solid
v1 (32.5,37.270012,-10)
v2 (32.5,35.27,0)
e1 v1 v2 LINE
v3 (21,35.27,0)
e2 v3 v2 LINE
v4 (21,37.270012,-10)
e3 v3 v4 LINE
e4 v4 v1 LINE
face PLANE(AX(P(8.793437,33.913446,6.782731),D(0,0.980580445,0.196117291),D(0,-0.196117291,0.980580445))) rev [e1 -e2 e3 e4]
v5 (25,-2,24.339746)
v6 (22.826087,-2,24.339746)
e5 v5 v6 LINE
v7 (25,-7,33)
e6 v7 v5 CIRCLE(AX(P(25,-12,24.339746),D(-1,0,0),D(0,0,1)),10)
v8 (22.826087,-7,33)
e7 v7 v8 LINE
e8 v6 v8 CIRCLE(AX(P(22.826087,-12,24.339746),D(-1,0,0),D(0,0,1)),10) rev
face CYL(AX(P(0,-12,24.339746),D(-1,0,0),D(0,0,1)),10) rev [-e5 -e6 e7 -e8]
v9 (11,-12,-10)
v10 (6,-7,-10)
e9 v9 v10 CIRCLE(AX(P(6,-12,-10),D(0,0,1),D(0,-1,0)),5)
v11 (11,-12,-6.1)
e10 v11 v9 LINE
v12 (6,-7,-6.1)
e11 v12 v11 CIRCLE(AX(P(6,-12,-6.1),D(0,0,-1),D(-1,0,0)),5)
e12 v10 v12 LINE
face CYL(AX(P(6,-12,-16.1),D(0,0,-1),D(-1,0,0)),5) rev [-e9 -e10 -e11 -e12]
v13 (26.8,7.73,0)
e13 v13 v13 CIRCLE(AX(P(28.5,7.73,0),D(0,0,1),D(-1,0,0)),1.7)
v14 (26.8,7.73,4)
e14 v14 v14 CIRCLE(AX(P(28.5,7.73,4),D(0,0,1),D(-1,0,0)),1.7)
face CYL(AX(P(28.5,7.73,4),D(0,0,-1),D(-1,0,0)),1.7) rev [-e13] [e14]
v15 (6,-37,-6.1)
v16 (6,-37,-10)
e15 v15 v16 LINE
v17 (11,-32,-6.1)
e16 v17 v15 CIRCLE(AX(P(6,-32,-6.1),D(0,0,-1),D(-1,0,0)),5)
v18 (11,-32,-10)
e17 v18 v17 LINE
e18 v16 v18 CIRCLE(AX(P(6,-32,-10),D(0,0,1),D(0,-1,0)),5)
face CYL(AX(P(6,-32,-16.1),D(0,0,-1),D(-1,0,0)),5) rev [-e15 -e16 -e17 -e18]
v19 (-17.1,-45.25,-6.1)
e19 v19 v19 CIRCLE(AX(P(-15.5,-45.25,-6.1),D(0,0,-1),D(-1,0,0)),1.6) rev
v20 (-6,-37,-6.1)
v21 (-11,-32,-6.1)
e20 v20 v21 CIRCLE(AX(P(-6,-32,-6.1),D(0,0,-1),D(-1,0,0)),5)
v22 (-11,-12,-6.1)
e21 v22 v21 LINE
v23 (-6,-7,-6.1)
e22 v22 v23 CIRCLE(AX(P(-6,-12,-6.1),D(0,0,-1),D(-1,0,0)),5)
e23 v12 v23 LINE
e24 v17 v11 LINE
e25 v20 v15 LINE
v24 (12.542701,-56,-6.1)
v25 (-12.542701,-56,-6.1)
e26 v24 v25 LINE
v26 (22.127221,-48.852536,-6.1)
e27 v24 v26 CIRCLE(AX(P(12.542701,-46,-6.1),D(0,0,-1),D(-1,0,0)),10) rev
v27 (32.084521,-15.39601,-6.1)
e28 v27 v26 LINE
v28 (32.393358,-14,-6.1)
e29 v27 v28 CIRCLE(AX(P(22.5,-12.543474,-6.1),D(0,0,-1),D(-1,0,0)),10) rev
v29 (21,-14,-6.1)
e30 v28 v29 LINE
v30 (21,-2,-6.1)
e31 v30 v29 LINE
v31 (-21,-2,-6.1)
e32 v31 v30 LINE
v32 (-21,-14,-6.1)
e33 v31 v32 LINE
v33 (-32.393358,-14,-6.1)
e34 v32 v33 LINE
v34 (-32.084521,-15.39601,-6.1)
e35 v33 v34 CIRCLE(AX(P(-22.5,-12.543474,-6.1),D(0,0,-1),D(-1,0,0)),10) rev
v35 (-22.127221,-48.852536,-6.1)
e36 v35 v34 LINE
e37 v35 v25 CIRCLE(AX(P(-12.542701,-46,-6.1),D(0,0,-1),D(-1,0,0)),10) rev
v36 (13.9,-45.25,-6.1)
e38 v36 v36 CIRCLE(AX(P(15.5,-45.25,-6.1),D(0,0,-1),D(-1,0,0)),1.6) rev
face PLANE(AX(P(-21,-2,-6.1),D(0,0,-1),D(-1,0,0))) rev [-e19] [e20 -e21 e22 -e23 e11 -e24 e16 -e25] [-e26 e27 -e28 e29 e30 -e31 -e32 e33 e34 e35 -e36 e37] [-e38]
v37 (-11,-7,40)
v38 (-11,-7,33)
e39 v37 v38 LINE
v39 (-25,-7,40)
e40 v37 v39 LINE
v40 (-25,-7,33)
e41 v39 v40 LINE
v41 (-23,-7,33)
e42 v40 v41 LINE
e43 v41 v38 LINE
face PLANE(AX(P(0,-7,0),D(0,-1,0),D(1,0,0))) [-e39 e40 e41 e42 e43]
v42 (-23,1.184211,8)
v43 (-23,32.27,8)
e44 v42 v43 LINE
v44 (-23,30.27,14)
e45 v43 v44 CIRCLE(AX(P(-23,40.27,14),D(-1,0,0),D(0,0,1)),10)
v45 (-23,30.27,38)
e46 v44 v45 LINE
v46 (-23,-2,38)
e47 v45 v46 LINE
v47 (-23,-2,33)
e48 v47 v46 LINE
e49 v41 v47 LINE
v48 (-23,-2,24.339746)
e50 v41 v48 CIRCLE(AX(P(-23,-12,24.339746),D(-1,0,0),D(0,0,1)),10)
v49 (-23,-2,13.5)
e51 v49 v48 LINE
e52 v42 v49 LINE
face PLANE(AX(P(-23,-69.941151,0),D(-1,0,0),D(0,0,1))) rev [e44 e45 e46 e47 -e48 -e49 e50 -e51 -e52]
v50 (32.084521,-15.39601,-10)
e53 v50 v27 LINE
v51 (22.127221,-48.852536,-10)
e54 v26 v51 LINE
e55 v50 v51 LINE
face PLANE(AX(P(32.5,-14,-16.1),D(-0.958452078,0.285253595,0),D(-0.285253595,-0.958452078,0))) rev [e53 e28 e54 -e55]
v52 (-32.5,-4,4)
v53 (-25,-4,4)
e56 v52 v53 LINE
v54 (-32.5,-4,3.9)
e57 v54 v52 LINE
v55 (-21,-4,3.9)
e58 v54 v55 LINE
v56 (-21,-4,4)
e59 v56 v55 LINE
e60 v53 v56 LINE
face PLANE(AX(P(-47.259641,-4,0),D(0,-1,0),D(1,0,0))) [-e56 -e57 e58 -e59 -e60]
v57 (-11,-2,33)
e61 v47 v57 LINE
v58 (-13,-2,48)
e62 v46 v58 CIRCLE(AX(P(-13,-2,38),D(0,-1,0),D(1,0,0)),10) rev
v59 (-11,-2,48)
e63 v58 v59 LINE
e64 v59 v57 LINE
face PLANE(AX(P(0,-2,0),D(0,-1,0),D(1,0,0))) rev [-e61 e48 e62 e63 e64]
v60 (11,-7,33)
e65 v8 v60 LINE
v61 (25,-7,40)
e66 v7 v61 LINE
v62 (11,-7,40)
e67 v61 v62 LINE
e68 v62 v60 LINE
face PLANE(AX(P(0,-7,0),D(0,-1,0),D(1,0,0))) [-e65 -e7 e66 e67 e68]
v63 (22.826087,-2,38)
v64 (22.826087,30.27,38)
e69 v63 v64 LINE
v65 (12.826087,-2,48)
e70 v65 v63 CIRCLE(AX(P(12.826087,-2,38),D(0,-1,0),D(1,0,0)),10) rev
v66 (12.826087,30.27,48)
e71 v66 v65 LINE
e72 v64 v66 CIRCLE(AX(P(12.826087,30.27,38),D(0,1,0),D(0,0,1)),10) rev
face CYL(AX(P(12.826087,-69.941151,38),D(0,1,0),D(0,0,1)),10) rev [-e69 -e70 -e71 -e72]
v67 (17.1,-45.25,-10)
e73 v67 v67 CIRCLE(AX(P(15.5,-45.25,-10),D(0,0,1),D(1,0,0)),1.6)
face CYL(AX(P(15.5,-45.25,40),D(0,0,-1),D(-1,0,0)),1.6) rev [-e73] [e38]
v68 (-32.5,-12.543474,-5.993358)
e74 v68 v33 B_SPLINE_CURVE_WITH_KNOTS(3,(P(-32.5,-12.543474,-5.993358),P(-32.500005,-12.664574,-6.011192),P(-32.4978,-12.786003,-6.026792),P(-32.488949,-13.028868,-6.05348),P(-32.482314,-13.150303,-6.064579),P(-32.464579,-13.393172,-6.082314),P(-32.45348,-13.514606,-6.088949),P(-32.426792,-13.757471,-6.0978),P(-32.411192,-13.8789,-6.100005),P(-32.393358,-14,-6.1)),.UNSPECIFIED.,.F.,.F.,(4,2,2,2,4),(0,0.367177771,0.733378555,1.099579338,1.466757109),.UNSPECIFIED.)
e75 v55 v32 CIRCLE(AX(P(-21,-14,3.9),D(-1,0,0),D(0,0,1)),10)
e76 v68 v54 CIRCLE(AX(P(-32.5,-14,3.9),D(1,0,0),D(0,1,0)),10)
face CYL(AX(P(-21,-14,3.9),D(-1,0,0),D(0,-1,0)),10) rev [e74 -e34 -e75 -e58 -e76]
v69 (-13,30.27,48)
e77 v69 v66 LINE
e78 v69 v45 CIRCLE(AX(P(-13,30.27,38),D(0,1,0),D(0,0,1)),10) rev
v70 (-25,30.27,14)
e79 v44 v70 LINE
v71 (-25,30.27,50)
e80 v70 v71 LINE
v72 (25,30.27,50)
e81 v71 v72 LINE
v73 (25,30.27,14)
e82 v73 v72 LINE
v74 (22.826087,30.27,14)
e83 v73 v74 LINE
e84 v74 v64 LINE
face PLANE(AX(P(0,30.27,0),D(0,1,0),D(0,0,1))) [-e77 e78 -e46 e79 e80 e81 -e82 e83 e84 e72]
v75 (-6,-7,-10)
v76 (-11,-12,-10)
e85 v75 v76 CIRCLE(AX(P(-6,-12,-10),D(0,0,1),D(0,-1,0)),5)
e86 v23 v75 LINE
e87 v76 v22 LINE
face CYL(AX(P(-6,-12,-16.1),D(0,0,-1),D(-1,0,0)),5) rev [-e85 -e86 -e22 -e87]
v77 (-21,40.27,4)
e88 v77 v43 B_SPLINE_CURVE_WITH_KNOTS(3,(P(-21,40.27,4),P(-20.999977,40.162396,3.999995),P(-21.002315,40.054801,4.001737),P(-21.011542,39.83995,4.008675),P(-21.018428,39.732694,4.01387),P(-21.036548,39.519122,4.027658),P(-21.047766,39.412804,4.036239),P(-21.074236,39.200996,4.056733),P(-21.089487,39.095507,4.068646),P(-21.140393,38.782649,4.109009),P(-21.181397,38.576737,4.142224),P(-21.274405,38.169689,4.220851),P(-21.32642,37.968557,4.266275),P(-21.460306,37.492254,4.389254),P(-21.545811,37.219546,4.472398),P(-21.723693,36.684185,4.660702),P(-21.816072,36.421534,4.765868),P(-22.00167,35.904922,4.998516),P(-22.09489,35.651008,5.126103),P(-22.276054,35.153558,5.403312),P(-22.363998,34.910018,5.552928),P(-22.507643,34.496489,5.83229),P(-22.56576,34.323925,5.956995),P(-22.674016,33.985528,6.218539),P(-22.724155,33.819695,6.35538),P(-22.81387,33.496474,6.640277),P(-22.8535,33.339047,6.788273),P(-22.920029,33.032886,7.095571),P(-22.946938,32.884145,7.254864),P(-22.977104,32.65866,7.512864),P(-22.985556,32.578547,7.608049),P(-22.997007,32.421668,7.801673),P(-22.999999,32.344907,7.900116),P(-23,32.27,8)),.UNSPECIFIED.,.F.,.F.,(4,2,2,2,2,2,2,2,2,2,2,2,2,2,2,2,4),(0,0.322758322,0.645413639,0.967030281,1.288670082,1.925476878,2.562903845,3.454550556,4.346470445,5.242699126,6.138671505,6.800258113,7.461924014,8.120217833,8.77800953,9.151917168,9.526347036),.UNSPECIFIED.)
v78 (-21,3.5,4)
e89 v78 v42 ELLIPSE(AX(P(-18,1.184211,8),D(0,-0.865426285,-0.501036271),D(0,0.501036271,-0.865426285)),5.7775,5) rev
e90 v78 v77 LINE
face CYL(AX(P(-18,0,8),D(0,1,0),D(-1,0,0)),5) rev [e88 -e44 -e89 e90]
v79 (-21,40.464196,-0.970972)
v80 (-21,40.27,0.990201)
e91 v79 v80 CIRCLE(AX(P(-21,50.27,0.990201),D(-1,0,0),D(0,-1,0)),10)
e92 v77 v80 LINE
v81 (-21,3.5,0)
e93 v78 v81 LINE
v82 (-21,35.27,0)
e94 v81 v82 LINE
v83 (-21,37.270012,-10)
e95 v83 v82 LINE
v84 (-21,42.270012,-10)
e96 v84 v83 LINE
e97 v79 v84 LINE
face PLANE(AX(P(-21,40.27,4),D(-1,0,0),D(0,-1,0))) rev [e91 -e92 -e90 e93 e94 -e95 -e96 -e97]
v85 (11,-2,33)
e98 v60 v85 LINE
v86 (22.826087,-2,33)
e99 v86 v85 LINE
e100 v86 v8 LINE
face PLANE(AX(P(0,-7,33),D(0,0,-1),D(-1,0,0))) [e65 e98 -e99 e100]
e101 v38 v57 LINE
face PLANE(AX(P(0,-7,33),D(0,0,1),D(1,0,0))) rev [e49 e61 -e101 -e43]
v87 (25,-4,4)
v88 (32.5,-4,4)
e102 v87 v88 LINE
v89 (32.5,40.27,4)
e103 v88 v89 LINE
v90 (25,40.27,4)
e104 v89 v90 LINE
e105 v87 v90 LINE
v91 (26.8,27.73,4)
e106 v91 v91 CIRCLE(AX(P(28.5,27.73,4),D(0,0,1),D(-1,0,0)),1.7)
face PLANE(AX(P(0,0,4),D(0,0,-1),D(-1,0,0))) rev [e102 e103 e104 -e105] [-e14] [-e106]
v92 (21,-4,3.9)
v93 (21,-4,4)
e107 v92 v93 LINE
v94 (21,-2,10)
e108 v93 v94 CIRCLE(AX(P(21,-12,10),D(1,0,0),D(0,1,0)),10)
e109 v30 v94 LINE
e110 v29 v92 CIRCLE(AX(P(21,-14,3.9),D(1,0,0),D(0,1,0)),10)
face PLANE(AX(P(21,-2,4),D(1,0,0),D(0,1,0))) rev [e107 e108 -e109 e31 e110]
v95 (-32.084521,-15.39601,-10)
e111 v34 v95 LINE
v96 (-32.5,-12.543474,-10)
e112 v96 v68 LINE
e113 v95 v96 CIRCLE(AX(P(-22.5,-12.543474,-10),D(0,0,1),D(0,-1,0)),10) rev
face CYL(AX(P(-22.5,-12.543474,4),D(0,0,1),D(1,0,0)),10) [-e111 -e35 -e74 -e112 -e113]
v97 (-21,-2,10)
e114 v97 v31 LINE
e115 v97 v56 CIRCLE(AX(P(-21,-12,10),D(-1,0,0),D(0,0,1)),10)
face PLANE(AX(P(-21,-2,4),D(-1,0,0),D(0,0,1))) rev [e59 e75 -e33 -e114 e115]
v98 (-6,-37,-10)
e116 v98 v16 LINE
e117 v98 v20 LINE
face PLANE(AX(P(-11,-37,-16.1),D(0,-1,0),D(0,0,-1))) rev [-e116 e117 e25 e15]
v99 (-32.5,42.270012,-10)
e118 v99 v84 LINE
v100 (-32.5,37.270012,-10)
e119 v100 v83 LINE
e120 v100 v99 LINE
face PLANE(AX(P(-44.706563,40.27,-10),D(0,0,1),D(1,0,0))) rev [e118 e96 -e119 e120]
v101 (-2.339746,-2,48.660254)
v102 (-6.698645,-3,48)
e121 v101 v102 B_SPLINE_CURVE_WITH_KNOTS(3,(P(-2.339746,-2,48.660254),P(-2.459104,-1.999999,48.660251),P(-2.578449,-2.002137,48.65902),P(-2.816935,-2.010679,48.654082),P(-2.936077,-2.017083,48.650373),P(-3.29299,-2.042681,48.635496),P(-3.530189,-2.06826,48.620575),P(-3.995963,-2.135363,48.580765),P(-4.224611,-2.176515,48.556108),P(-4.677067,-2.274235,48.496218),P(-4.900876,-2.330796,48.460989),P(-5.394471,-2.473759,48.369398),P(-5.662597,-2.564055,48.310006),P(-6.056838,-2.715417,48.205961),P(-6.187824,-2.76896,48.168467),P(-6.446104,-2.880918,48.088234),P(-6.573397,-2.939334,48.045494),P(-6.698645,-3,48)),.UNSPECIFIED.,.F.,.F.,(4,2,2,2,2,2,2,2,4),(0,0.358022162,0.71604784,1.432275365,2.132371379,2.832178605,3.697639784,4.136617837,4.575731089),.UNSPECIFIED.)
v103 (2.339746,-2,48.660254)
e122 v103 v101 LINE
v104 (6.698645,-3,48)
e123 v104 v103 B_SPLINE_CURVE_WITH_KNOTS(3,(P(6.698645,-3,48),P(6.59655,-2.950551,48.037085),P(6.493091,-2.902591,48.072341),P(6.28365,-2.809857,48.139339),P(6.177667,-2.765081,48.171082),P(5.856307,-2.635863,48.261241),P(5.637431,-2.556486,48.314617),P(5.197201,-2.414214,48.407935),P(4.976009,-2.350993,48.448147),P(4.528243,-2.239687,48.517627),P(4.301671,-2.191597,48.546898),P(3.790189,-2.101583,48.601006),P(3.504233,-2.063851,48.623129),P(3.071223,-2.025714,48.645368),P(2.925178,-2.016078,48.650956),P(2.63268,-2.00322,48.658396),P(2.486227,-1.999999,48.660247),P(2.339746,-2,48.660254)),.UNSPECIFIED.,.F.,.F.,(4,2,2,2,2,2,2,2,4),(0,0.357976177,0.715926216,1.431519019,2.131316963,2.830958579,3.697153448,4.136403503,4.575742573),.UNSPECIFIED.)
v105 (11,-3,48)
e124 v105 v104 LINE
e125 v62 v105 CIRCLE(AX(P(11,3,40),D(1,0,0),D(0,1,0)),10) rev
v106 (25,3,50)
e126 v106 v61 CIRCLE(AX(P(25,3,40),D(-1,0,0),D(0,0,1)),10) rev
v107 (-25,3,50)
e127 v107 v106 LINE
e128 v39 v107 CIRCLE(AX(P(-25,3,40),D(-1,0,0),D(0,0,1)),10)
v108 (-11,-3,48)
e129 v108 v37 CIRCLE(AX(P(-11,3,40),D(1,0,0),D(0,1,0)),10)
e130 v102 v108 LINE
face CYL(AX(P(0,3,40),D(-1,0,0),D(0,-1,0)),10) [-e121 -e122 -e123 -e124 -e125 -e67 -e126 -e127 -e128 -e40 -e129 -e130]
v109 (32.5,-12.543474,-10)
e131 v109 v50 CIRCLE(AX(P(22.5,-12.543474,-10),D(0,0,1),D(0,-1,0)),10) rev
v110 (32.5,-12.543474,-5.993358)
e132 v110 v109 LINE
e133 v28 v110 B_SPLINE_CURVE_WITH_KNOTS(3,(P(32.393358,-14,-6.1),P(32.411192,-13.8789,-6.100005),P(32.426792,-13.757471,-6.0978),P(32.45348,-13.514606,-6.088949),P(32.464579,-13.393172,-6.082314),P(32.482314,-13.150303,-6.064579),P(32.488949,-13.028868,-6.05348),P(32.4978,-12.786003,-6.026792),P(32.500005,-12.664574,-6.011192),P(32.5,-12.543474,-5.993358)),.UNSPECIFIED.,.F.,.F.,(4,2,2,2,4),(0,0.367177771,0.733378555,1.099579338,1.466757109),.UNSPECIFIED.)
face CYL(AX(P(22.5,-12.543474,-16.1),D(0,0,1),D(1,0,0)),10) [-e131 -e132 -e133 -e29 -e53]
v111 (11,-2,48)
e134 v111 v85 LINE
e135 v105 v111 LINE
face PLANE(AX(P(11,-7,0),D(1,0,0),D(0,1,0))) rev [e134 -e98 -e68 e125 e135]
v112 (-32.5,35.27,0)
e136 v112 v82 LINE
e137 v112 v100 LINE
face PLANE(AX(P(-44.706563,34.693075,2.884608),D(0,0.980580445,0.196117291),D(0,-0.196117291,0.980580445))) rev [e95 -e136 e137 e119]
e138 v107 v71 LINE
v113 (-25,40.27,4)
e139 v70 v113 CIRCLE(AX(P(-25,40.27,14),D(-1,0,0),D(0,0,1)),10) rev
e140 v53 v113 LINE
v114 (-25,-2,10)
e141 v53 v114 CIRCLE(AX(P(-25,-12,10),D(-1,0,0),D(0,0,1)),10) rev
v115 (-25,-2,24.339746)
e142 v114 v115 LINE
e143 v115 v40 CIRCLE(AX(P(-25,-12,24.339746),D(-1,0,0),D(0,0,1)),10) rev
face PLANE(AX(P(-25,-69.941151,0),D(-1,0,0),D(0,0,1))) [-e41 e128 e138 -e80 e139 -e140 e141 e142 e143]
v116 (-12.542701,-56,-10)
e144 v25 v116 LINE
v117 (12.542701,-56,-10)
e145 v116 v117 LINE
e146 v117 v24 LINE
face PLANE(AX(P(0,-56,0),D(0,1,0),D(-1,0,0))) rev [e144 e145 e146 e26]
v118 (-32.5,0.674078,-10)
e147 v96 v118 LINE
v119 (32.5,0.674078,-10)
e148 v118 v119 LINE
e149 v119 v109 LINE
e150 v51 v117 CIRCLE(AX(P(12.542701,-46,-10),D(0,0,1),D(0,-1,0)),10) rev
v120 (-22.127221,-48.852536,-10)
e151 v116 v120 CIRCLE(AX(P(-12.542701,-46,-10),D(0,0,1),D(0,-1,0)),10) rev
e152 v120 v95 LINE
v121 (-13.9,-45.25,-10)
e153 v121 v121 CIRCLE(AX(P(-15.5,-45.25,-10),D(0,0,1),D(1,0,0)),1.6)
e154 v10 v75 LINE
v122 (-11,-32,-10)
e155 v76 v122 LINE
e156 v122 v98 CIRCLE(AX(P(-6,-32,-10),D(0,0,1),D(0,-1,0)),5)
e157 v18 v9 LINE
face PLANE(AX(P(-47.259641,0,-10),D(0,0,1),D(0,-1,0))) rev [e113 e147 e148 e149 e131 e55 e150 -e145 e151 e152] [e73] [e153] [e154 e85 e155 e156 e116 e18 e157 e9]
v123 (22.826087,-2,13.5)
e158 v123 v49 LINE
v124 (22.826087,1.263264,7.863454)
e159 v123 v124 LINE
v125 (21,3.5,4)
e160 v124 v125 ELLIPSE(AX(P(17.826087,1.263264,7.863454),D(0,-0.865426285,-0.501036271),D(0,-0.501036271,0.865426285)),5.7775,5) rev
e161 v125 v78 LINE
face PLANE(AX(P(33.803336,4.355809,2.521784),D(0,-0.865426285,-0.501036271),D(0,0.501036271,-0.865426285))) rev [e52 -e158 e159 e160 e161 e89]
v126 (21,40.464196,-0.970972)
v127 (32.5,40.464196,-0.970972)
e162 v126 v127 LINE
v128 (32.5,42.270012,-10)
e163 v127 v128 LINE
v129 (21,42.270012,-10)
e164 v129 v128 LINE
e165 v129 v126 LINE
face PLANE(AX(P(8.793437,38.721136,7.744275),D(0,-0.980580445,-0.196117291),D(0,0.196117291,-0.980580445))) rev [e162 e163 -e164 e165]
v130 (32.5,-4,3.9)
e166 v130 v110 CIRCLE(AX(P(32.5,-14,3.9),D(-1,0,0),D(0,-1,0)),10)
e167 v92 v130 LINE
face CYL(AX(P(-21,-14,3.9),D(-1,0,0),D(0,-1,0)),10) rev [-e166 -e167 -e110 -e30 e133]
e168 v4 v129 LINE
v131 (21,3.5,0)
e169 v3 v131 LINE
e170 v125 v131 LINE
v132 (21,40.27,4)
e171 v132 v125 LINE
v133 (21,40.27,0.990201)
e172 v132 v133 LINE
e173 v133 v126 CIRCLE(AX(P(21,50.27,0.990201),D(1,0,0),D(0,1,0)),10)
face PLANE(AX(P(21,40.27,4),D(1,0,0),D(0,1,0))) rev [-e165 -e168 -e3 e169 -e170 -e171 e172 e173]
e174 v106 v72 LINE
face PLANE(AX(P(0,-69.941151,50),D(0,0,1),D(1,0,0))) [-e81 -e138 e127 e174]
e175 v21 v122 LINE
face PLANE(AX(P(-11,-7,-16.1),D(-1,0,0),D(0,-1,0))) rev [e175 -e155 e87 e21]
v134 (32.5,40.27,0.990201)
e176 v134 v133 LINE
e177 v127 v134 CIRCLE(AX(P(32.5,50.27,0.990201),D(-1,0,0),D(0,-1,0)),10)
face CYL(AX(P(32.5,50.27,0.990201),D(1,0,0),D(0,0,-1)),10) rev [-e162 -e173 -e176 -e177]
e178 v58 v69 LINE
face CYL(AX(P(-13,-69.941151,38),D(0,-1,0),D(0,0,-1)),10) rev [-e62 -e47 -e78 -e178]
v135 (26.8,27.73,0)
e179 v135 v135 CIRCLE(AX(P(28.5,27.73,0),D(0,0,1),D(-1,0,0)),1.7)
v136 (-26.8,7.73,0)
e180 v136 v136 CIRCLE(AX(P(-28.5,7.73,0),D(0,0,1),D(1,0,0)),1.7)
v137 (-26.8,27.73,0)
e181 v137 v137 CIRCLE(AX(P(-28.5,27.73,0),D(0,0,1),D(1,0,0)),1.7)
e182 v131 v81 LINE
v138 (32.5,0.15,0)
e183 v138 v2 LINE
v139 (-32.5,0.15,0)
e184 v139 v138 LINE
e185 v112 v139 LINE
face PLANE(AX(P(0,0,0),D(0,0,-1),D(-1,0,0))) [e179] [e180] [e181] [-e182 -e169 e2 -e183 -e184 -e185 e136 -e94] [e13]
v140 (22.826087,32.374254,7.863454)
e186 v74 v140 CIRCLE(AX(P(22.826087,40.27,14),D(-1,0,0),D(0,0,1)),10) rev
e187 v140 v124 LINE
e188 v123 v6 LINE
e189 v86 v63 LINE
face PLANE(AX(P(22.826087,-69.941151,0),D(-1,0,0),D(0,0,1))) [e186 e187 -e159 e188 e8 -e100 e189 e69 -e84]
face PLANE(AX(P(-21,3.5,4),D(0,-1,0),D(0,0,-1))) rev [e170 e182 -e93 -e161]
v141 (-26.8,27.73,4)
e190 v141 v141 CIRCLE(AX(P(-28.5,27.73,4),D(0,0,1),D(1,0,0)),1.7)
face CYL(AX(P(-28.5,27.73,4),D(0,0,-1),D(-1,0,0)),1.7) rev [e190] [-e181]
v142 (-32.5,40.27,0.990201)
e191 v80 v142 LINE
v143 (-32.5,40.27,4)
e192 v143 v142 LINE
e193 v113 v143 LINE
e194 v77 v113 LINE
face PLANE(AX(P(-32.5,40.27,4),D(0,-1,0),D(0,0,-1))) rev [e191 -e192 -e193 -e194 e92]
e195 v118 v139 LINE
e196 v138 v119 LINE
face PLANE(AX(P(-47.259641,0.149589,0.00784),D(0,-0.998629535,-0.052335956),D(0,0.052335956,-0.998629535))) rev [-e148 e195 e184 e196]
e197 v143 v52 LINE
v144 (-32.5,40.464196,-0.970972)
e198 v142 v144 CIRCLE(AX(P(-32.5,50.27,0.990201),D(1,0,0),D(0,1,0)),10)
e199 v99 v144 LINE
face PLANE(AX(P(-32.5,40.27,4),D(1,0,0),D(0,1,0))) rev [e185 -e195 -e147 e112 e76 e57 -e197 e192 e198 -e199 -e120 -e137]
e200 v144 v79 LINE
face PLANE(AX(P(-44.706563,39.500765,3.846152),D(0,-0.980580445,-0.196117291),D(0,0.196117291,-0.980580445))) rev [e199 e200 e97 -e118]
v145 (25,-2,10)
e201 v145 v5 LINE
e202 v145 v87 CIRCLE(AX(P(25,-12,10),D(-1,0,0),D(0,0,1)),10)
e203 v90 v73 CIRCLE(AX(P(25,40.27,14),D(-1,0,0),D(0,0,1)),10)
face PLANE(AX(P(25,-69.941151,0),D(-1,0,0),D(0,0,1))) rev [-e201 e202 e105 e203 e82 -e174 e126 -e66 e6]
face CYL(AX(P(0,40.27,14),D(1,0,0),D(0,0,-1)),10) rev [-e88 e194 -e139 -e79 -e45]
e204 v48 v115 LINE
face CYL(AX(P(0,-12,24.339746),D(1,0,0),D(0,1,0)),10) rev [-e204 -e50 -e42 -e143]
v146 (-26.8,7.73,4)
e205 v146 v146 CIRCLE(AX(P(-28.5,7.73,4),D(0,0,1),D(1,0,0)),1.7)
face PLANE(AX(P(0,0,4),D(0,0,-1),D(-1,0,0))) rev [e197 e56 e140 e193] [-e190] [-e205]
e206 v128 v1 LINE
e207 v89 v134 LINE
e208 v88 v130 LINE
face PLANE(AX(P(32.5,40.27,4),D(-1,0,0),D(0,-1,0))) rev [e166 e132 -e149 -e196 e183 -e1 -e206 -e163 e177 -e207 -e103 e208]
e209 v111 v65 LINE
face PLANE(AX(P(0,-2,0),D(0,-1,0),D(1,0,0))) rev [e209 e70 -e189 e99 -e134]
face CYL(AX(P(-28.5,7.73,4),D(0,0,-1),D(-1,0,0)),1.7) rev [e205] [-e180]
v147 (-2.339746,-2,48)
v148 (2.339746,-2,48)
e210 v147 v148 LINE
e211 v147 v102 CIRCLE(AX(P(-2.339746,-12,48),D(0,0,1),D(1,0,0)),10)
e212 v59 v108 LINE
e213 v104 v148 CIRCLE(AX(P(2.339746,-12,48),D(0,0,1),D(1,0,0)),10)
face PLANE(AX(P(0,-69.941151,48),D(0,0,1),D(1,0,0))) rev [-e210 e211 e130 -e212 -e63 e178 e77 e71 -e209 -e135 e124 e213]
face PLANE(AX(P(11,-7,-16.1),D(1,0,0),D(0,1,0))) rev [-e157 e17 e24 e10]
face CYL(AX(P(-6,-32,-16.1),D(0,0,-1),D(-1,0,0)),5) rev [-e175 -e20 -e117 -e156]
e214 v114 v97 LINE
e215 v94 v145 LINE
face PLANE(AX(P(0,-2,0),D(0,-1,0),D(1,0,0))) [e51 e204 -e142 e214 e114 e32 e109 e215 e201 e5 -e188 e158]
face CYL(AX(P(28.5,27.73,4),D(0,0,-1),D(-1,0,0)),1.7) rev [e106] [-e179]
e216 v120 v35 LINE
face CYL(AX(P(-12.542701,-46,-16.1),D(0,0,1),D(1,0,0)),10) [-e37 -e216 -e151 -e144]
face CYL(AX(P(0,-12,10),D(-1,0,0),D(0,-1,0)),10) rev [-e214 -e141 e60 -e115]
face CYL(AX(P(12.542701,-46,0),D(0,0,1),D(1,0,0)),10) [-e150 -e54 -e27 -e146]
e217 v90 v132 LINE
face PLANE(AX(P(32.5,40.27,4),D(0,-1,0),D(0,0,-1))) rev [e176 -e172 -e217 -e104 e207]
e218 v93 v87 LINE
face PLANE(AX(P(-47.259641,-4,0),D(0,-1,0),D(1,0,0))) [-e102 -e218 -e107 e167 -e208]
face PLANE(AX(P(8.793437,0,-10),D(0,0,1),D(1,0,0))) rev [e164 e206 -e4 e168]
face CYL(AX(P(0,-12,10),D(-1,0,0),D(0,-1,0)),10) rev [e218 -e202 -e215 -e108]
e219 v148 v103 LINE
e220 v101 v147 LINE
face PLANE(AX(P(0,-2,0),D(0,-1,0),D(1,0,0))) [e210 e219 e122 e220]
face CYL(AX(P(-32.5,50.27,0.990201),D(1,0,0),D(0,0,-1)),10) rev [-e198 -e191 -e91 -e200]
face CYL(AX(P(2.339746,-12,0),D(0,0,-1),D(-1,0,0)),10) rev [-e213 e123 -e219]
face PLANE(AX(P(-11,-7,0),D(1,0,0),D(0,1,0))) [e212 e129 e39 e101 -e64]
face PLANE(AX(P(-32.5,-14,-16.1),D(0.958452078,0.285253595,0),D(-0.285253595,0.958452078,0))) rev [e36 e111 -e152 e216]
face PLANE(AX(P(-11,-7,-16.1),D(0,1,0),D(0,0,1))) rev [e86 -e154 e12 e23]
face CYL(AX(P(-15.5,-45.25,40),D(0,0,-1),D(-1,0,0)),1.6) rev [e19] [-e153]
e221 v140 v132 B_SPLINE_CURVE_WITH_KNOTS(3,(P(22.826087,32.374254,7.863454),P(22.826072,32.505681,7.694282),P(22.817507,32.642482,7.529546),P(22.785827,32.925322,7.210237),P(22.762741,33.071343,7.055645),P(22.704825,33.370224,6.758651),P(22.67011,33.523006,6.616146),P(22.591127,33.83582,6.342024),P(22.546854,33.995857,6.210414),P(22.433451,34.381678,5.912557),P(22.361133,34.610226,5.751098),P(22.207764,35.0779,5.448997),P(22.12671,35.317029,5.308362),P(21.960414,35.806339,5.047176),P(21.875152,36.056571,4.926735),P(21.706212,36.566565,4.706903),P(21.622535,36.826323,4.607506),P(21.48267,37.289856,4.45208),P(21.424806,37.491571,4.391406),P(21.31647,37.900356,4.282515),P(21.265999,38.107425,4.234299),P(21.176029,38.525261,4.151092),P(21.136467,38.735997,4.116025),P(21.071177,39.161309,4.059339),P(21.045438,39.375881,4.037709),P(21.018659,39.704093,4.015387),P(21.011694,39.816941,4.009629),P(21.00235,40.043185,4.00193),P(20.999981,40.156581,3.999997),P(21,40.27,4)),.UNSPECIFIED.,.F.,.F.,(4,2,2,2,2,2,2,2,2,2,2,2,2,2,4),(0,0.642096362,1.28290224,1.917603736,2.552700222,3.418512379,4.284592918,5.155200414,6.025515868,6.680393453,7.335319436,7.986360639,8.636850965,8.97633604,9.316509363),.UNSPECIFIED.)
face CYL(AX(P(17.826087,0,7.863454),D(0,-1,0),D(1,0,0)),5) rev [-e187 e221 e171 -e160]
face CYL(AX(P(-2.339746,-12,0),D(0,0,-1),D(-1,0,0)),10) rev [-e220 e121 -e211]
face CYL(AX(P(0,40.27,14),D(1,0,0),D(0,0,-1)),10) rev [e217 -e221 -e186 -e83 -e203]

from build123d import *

# Parameters (mm, degrees)
SKETCH1_R            = 1.7
BOSS_EXTRUDE1_DEPTH  = 4
BOSS_EXTRUDE7_DEPTH  = 65
SKETCH9_W            = 42
SKETCH9_H            = 10.1
CUT_EXTRUDE2_DEPTH   = 2
SKETCH4_W            = 65
SKETCH4_H            = 3.9
BOSS_EXTRUDE3_DEPTH  = 52
SKETCH5_R            = 1.6
CUT_EXTRUDE1_DEPTH   = 50
BOSS_EXTRUDE8_START  = -10
BOSS_EXTRUDE8_DEPTH  = 32.27
FILLET1_R            = 10
BOSS_EXTRUDE9_DEPTH  = 11.5
BOSS_EXTRUDE12_START = -65
BOSS_EXTRUDE12_DEPTH = 11.5
FILLET5_R            = 10
SKETCH14_W           = 12
SKETCH14_H           = 15
SKETCH14_W_2         = 11.826086957
BOSS_EXTRUDE10_DEPTH = 5
FILLET3_R            = 10
SKETCH15_W           = 22
SKETCH15_H           = 30
CUT_EXTRUDE3_DEPTH   = 10
FILLET6_R            = 5
FILLET7_R            = 10
BOSS_EXTRUDE13_REACH = 95.361
FILLET8_R            = 10
FILLET9_R            = 5
FILLET10_START       = -2
FILLET10_DEPTH       = 32.27
FILLET10_START_2     = -32.5
FILLET10_2_DEPTH     = 65
FILLET10_START_3     = 20.99999979
FILLET10_3_DEPTH     = 4.00000021
FILLET10_START_4     = -25
FILLET10_4_DEPTH     = 4
FILLET10_START_5     = 30.27
FILLET10_5_DEPTH     = 12.000012257


with BuildPart() as part:
    # Sketch1 → Boss-Extrude1 (new body)
    with BuildSketch(Plane.XY):
        Polygon((-21, 40.27), (-21, 3.5), (21, 3.5), (21, 40.27), (32.5, 40.27), (32.5, 0), (-32.5, 0), (-32.5, 40.27), align=None)
        with Locations((-28.5, 27.73)):
            Circle(SKETCH1_R, mode=Mode.SUBTRACT)
        with Locations((-28.5, 7.73)):
            Circle(SKETCH1_R, mode=Mode.SUBTRACT)
        with Locations(Location((28.5, 7.73, 0), (0, 0, 180))):
            Circle(SKETCH1_R, mode=Mode.SUBTRACT)
        with Locations(Location((28.5, 27.73, 0), (0, 0, 180))):
            Circle(SKETCH1_R, mode=Mode.SUBTRACT)
    extrude(amount=BOSS_EXTRUDE1_DEPTH)

    # Sketch7 → Boss-Extrude7 (add)
    with BuildSketch(Plane(origin=(32.5, 0, 0), x_dir=(0, 0, -1), z_dir=(1, 0, 0))):
        Polygon((0, 0), (-4, 0), (-4, -4), (10, -4), (10, 0.674077793), (0, 0.15), align=None)
    extrude(amount=-BOSS_EXTRUDE7_DEPTH)

    # Sketch9 → Cut-Extrude2 (cut)
    with BuildSketch(Plane.XZ.offset(4)):
        with Locations((0, -1.05)):
            Rectangle(SKETCH9_W, SKETCH9_H)
    extrude(amount=-CUT_EXTRUDE2_DEPTH, mode=Mode.SUBTRACT)

    # Sketch4 → Boss-Extrude3 (add)
    with BuildSketch(Plane.XZ.offset(4)):
        with Locations((0, -8.05)):
            Rectangle(SKETCH4_W, SKETCH4_H)
    extrude(amount=BOSS_EXTRUDE3_DEPTH)

    # Sketch5 → Cut-Extrude1 (cut)
    with BuildSketch(Plane.XY.offset(-10)):
        with Locations(Location((-15.5, -45.25, 0), (0, 0, 180))):
            Circle(SKETCH5_R)
        with Locations(Location((15.5, -45.25, 0), (0, 0, 180))):
            Circle(SKETCH5_R)
    extrude(amount=CUT_EXTRUDE1_DEPTH, mode=Mode.SUBTRACT)

    # Sketch11 → Boss-Extrude8 (add)
    with BuildSketch(Plane(origin=(0, 40.27, 0), x_dir=(1, 0, 0), z_dir=(0, 1, 0)).offset(BOSS_EXTRUDE8_START)):
        Polygon((-23, -4), (-25, -4), (-25, -50), (25, -50), (25, -4), (22.826086957, -4), (22.826086957, -48), (-23, -48), align=None)
    extrude(amount=-BOSS_EXTRUDE8_DEPTH)

    # Fillet1
    fillet1_edges = [part.edges().sort_by_distance(p)[0] for p in [
        (-26.75, -4, -6.1),
        (26.75, -4, -6.1),
    ]]
    fillet(fillet1_edges, radius=FILLET1_R)

    # Sketch13 → Boss-Extrude9 (add)
    with BuildSketch(Plane(origin=(32.5, 0, 0), x_dir=(0, 0, -1), z_dir=(1, 0, 0))):
        Polygon((10, 42.270012257), (0, 40.27), (0, 35.27), (10, 37.270012257), align=None)
    extrude(amount=-BOSS_EXTRUDE9_DEPTH)

    # Sketch13<8> → Boss-Extrude12 (add)
    with BuildSketch(Plane(origin=(32.5, 0, 0), x_dir=(0, 0, -1), z_dir=(1, 0, 0)).offset(BOSS_EXTRUDE12_START)):
        Polygon((0, 40.27), (10, 42.270012257), (10, 37.270012257), (0, 35.27), align=None)
    extrude(amount=BOSS_EXTRUDE12_DEPTH)

    # Fillet5
    fillet5_edges = [part.edges().sort_by_distance(p)[0] for p in [
        (-26.75, 40.27, 0),
        (26.75, 40.27, 0),
    ]]
    fillet(fillet5_edges, radius=FILLET5_R)

    # Sketch14 → Boss-Extrude10 (add)
    with BuildSketch(Plane.XZ.offset(2)):
        with Locations((-17, 40.5)):
            Rectangle(SKETCH14_W, SKETCH14_H)
        with Locations((16.913043479, 40.5)):
            Rectangle(SKETCH14_W_2, SKETCH14_H)
        Polygon((25, 50), (11, 50), (11, 48), (22.826086957, 48), (22.826086957, 33), (25, 33), align=None)
        Polygon((-11, 50), (-25, 50), (-25, 33), (-23, 33), (-23, 48), (-11, 48), align=None)
    extrude(amount=BOSS_EXTRUDE10_DEPTH)

    # Fillet3
    # the kernel refuses this fillet: 10 mm, written as the material it adds along each edge
    with BuildSketch(Plane(origin=(22.826086957, -2, 33), x_dir=(0, -1, 0), z_dir=(1, 0, 0))) as fillet3_piece_1:
        with BuildLine():
            CenterArc((10, 8.660254038), FILLET3_R, 180, 60)
            Line((0, 8.660254038), (0, 0))
            Line((0, 0), (5, 0))
        make_face()
    extrude(amount=2.173913043)
    with BuildSketch(Plane(origin=(-25, -2, 33), x_dir=(0, -1, 0), z_dir=(1, 0, 0)), Plane(origin=(11, -2, 50), x_dir=(0, -1, 0), z_dir=(0, 0, -1))) as fillet3_piece_2:
        with BuildLine():
            CenterArc((10, 8.660254038), FILLET3_R, 180, 60)
            Line((0, 8.660254038), (0, 0))
            Line((0, 0), (5, 0))
        make_face()
    extrude(amount=2)
    with BuildSketch(Plane(origin=(-11, -2, 48), x_dir=(1, 0, 0), z_dir=(0, 0, 1))) as fillet3_piece_3:
        with BuildLine():
            CenterArc((8.660254038, -10), FILLET3_R, 90, 60)
            Line((0, -5), (0, 0))
            Line((0, 0), (8.660254038, 0))
        make_face()
    extrude(amount=2)

    # Sketch15 → Cut-Extrude3 (cut)
    with BuildSketch(Plane.XY.offset(-6.1)):
        with Locations((0, -22)):
            Rectangle(SKETCH15_W, SKETCH15_H)
        Polygon((-32.5, -14), (-20, -56), (-32.5, -56), align=None)
        Polygon((32.5, -56), (20, -56), (32.5, -14), align=None)
    extrude(amount=-CUT_EXTRUDE3_DEPTH, mode=Mode.SUBTRACT)

    # Fillet6
    fillet6_edges = [part.edges().sort_by_distance(p)[0] for p in [
        (-11, -37, -8.05),
        (-11, -7, -8.05),
        (11, -7, -8.05),
        (11, -37, -8.05),
    ]]
    fillet(fillet6_edges, radius=FILLET6_R)

    # Fillet7
    fillet7_edges = [part.edges().sort_by_distance(p)[0] for p in [
        (-20, -56, -8.05),
        (-32.5, -14, -8.05),
        (32.5, -14, -8.05),
        (20, -56, -8.05),
    ]]
    fillet(fillet7_edges, radius=FILLET7_R)

    # Boss-Extrude13: up to this face of the body (flat: up to its plane)
    boss_extrude13_end = Plane(part.part.faces().sort_by_distance((22.826086957, 13.980833311, 26.043580166))[0])
    # Sketch16 → Boss-Extrude13 (add, up to the picked face)
    with BuildSketch(Plane(origin=(-23, 0, 0), x_dir=(0, 0, -1), z_dir=(1, 0, 0)), mode=Mode.PRIVATE) as boss_extrude13_sk1:
        Polygon((-4, -2), (-4, 3.5), (-13.5, -2), align=None)
    boss_extrude13_tool1 = split(extrude(boss_extrude13_sk1.sketch, amount=BOSS_EXTRUDE13_REACH, mode=Mode.PRIVATE), bisect_by=boss_extrude13_end, keep=Keep.BOTH, mode=Mode.PRIVATE)
    add(boss_extrude13_tool1.solids().sort_by(Axis((-23, -0.166667, 7.166667), (1, 0, 0)))[0])

    # Fillet8
    # the kernel refuses this fillet: 10 mm, written as the material it adds along each edge
    with BuildSketch(Plane(origin=(-21, -2, 4), x_dir=(0, -1, 0), z_dir=(-1, 0, 0)), Plane(origin=(25, -2, 4), x_dir=(0, -1, 0), z_dir=(-1, 0, 0))) as fillet8_piece_1:
        with BuildLine():
            CenterArc((10, 6), FILLET8_R, 180, 36.869897646)
            Line((0, 6), (-0.2, 6))
            Line((-0.2, 6), (-0.2, 0))
            Line((-0.2, 0), (0, -0.2))
            ThreePointArc((0, -0.2), (1, -0.2), (1.84, -0.12))
            Line((1.84, -0.12), (2, 0))
        make_face()
    extrude(amount=4)

    # Fillet9
    # the kernel refuses this fillet: 5 mm, written as the material it adds along each edge
    with BuildSketch(Plane(origin=(22.826086957, 30.27, 4), x_dir=(-1, 0, 0), z_dir=(0, -1, 0))) as fillet9_piece_1_section:
        with BuildLine():
            CenterArc((5, -3.863453894), FILLET9_R, 129.403862825, 50.596137175)
            Line((0, -3.863453894), (0, 0))
            Line((0, 0), (1.826086957, 0))
        make_face()
    fillet9_piece_1 = extrude(amount=36.428634735, mode=Mode.PRIVATE)
    fillet9_piece_1 = split(fillet9_piece_1, bisect_by=Plane(origin=(22.826086957, -2, 4), z_dir=(0, 1, 0)), keep=Keep.TOP, mode=Mode.PRIVATE)
    add(fillet9_piece_1)
    with BuildSketch(Plane(origin=(-23, 30.27, 4), x_dir=(0, 0, 1), z_dir=(0, -1, 0))) as fillet9_piece_2_section:
        with BuildLine():
            CenterArc((4, -5), FILLET9_R, 90, 53.130102354)
            Line((0, -2), (0, 0))
            Line((0, 0), (4, 0))
        make_face()
    fillet9_piece_2 = extrude(amount=36.77, mode=Mode.PRIVATE)
    fillet9_piece_2 = split(fillet9_piece_2, bisect_by=Plane(origin=(-23, -2, 4), z_dir=(0, 1, 0)), keep=Keep.TOP, mode=Mode.PRIVATE)
    add(fillet9_piece_2)

    # Fillet10: read off the stored shape, not the designer's step
    # Fillet10 outline → Fillet10 (add)
    with BuildSketch(Plane(origin=(0, 0, 0), x_dir=(1, 0, 0), z_dir=(0, 1, 0)).offset(FILLET10_START)):
        with BuildLine():
            Line((-23, -48), (-13, -48))
            ThreePointArc((-13, -48), (-20.071067812, -45.071067812), (-23, -38))
            Line((-23, -38), (-23, -48))
        make_face()
        with BuildLine():
            ThreePointArc((22.826086957, -38), (19.897154769, -45.071067812), (12.826086957, -48))
            Line((12.826086957, -48), (22.826086957, -48))
            Line((22.826086957, -48), (22.826086957, -38))
        make_face()
    extrude(amount=FILLET10_DEPTH)

    # Fillet10 2 outline → Fillet10 2 (cut)
    with BuildSketch(Plane.YZ.offset(FILLET10_START_2)):
        with BuildLine():
            ThreePointArc((-7, 40), (-4.071067812, 47.071067812), (3, 50))
            Line((3, 50), (-7, 50))
            Line((-7, 50), (-7, 40))
        make_face()
    extrude(amount=FILLET10_2_DEPTH, mode=Mode.SUBTRACT)

    # Fillet10 3 outline → Fillet10 3 (add)
    with BuildSketch(Plane.YZ.offset(FILLET10_START_3)):
        with BuildLine():
            ThreePointArc((40.27, 4), (33.198932188, 6.928932188), (30.27, 14))
            Line((30.27, 14), (30.27, 4))
            Line((30.27, 4), (40.27, 4))
        make_face()
    extrude(amount=FILLET10_3_DEPTH)

    # Fillet10 4 outline → Fillet10 4 (add)
    with BuildSketch(Plane.YZ.offset(FILLET10_START_4)):
        with BuildLine():
            ThreePointArc((40.27, 4), (33.198932188, 6.928932188), (30.27, 14))
            Line((30.27, 14), (30.27, 4))
            Line((30.27, 4), (40.27, 4))
        make_face()
    extrude(amount=FILLET10_4_DEPTH)

    # Fillet10 5 outline → Fillet10 5 (cut)
    with BuildSketch(Plane(origin=(0, 0, 0), x_dir=(1, 0, 0), z_dir=(0, 1, 0)).offset(FILLET10_START_5)):
        with BuildLine():
            ThreePointArc((22.826086957, -7.863453894), (22.346570275, -5.726813876), (20.999994729, -3.99999567))
            Line((20.999994729, -3.99999567), (20.99999979, -14))
            Line((20.99999979, -14), (20.99999979, -15))
            Line((20.99999979, -15), (22.826086959, -15))
            Line((22.826086959, -15), (22.826086957, -7.863453894))
        make_face()
        with BuildLine():
            Line((-22.999999999, -15), (-21, -15))
            Line((-21, -15), (-21, -14))
            Line((-21, -14), (-20.9999923, -3.999994225))
            ThreePointArc((-20.9999923, -3.999994225), (-22.472133803, -5.763927718), (-23, -8))
            Line((-23, -8), (-22.999999999, -15))
        make_face()
    extrude(amount=FILLET10_5_DEPTH, mode=Mode.SUBTRACT)


solid = part.part
